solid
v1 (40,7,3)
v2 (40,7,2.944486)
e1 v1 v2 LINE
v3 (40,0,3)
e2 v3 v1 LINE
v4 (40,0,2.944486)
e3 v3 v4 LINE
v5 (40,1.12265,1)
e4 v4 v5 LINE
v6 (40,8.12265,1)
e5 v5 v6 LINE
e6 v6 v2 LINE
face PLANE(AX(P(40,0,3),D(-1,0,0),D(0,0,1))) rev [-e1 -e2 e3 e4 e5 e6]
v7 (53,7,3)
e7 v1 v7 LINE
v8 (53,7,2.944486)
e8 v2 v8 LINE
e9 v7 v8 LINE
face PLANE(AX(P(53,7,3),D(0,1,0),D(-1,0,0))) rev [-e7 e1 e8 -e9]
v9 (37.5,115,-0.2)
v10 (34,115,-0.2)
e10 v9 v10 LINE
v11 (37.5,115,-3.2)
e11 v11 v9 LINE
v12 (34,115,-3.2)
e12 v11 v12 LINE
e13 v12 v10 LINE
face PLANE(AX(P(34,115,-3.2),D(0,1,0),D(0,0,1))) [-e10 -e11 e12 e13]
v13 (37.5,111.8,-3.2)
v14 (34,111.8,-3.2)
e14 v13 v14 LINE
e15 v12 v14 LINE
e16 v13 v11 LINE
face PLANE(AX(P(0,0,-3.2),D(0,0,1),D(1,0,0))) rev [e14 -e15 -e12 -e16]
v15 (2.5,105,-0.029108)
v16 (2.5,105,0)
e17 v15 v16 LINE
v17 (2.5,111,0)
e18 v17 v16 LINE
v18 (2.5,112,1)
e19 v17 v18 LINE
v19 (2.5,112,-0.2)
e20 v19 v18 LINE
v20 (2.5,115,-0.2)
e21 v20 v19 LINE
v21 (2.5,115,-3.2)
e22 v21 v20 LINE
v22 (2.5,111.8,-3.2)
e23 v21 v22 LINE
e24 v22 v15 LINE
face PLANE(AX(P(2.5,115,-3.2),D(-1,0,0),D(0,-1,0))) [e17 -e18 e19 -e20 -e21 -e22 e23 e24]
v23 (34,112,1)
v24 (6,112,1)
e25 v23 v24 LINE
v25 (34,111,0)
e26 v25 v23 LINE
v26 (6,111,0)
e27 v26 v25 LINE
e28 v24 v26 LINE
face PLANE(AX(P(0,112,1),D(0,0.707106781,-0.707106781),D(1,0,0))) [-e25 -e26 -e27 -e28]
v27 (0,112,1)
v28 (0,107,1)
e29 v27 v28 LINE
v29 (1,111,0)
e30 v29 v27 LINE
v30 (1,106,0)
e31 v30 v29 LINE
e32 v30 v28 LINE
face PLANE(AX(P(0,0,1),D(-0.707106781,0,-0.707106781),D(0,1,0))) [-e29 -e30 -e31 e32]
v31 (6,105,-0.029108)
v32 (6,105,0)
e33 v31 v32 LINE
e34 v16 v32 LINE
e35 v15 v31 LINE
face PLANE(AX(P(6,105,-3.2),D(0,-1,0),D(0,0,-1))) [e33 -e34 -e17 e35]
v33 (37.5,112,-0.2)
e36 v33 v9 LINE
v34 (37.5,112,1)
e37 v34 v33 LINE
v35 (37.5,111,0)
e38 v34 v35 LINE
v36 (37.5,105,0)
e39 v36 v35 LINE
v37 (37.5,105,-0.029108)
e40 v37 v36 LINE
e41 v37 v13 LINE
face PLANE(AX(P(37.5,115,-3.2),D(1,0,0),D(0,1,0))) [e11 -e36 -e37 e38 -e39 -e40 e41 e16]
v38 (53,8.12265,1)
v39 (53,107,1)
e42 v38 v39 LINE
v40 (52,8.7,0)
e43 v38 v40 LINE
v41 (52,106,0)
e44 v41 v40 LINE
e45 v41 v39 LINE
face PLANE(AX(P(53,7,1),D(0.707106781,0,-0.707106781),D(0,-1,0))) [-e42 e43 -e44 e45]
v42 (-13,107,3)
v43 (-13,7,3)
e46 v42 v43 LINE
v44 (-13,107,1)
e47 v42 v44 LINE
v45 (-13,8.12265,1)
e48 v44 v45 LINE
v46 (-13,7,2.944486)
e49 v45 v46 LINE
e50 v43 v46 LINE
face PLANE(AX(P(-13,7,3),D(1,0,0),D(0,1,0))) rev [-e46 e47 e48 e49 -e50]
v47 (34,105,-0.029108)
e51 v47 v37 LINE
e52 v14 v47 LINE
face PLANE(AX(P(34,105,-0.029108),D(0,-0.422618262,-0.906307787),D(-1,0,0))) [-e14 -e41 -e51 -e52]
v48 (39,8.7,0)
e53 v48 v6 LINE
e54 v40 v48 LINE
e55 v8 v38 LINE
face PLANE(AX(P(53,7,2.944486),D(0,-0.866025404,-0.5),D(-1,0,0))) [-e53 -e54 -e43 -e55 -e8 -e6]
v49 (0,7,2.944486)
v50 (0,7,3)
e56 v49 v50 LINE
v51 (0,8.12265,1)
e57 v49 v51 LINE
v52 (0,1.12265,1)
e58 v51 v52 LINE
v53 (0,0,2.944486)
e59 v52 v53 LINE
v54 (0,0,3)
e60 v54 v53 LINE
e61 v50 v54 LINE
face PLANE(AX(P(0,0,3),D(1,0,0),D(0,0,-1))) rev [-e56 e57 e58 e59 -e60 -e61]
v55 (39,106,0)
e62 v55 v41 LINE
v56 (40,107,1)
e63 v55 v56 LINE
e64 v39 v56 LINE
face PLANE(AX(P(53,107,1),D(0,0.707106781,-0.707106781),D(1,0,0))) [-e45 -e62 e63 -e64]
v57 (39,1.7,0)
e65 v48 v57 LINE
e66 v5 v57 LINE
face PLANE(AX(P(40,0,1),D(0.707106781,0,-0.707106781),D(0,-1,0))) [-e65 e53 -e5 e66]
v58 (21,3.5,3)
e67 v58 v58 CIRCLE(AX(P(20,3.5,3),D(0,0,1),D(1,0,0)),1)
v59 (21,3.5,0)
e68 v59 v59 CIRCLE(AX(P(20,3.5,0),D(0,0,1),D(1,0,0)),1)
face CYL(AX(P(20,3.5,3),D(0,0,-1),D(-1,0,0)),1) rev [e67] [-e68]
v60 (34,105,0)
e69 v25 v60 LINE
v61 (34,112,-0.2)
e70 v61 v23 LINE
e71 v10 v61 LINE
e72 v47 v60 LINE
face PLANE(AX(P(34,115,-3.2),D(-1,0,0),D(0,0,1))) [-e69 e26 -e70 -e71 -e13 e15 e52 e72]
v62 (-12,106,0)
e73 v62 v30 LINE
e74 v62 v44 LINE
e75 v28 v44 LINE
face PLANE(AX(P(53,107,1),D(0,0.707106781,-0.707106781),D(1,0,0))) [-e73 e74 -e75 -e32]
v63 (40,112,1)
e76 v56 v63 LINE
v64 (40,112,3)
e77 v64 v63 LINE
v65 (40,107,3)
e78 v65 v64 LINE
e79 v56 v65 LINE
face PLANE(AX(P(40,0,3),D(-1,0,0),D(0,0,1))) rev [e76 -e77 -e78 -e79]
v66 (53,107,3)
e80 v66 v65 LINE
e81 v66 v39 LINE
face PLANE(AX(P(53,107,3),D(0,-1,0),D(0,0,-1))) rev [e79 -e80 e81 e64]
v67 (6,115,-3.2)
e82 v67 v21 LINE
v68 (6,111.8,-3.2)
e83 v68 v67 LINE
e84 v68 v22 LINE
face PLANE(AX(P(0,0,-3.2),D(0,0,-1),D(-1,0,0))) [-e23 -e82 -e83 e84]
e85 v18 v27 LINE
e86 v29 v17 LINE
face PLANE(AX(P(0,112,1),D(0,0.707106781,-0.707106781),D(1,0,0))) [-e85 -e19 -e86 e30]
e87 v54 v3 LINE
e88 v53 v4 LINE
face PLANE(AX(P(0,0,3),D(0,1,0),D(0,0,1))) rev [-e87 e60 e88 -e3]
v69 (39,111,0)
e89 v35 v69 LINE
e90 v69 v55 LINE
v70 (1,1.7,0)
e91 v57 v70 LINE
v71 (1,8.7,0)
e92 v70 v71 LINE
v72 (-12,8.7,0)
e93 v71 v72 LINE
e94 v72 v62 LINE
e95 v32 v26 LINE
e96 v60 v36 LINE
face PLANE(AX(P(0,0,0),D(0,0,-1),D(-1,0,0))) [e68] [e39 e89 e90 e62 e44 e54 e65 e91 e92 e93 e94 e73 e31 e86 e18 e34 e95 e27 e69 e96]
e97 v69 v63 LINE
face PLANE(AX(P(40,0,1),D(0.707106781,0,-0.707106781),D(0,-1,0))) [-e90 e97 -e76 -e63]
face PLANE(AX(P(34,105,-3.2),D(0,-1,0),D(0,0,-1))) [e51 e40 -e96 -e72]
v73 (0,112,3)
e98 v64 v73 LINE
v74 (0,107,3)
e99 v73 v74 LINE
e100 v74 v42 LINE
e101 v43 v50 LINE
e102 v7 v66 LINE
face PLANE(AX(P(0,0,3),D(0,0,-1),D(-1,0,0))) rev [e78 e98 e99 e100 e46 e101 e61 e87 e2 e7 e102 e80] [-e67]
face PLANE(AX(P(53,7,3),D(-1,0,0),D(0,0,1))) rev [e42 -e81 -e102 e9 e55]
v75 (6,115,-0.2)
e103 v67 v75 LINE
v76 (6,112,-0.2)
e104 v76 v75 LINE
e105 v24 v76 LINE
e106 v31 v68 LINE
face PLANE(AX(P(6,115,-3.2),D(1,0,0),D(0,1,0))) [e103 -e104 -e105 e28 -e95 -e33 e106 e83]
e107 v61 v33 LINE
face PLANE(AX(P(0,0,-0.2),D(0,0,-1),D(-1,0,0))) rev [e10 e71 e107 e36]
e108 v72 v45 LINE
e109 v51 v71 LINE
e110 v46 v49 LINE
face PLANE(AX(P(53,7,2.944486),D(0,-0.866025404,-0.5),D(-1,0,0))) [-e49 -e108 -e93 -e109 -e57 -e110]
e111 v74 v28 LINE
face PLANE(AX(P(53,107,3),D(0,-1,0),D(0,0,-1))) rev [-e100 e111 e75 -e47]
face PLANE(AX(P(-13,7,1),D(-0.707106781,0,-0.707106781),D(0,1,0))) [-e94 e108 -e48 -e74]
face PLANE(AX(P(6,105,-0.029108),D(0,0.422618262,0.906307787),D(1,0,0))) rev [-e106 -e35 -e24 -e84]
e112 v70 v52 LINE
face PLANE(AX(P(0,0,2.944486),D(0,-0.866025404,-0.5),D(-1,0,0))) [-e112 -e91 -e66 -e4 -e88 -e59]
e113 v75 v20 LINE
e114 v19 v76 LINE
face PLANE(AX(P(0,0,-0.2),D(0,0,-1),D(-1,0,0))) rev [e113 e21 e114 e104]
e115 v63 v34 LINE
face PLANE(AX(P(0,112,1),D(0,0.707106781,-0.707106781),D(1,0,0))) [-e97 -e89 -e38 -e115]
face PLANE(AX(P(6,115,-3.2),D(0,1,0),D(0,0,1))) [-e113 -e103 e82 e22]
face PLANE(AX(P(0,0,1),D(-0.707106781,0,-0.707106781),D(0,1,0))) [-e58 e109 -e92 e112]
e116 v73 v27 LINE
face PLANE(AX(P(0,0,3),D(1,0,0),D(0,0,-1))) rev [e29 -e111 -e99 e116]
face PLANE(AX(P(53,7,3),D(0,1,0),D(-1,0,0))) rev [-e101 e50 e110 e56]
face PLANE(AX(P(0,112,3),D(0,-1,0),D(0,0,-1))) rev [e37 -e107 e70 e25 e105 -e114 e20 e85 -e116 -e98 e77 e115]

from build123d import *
from OCP.BRepFilletAPI import BRepFilletAPI_MakeChamfer

# Parameters (mm, degrees)
SKETCH_1_W          = 40
SKETCH_1_H          = 112
EXTRUDE_1_DEPTH     = 3
SKETCH_2_R          = 1
CUT_EXTRUDE_1_DEPTH = 3
SKETCH_3_W          = 3.5
SKETCH_3_H          = 10
EXTRUDE_2_DEPTH     = 3.2
CHAMFER_1_SIZE      = 6.8
CHAMFER_1_SIZE2     = 3.170892075
SKETCH_4_W          = 66
SKETCH_4_H          = 100
EXTRUDE_3_DEPTH     = 3
SKETCH_5_W          = 42.259647881
SKETCH_5_H          = 3.16572893
CUT_EXTRUDE_2_DEPTH = 0.2
CHAMFER_3_SIZE      = 1
CHAMFER_4_SIZE      = 2.944486373
CHAMFER_4_SIZE_2    = 1.7


with BuildPart() as part:
    # 草圖1 → 填料-伸長1 (new body)
    with BuildSketch(Plane.XY):
        with Locations((20, 56)):
            Rectangle(SKETCH_1_W, SKETCH_1_H)
    extrude(amount=EXTRUDE_1_DEPTH)

    # 草圖2 → 除料-伸長1 (cut)
    with BuildSketch(Plane.XY):
        with Locations((20, 3.5)):
            Circle(SKETCH_2_R)
    extrude(amount=CUT_EXTRUDE_1_DEPTH, mode=Mode.SUBTRACT)

    # 草圖3 → 填料-伸長2 (add)
    with BuildSketch(Plane.XY):
        with Locations((35.75, 110)):
            Rectangle(SKETCH_3_W, SKETCH_3_H)
        with Locations((4.25, 110)):
            Rectangle(SKETCH_3_W, SKETCH_3_H)
    extrude(amount=-EXTRUDE_2_DEPTH)

    # 導角1: one chamfer whose edges measure the first distance from different faces: ONE call of the kernel's chamfer builder (chamfer() names one face for all edges)
    chamfer_1_edges_1 = [part.edges().sort_by_distance(p)[0] for p in [
        (35.75, 105, -3.2),
    ]]
    chamfer_1_side_1 = [part.faces().sort_by_distance(p)[0] for p in [
        (35.75, 110, -3.2),
    ]]
    chamfer_1_edges_2 = [part.edges().sort_by_distance(p)[0] for p in [
        (4.25, 105, -3.2),
    ]]
    chamfer_1_side_2 = [part.faces().sort_by_distance(p)[0] for p in [
        (4.25, 110, -3.2),
    ]]
    chamfer_1 = BRepFilletAPI_MakeChamfer(part.part.solid().wrapped)
    for e in chamfer_1_edges_1:
        chamfer_1.Add(CHAMFER_1_SIZE, CHAMFER_1_SIZE2, e.wrapped, chamfer_1_side_1[0].wrapped)  # the first distance lies on this face
    for e in chamfer_1_edges_2:
        chamfer_1.Add(CHAMFER_1_SIZE, CHAMFER_1_SIZE2, e.wrapped, chamfer_1_side_2[0].wrapped)  # the first distance lies on this face
    add(Compound.cast(chamfer_1.Shape()), mode=Mode.REPLACE)

    # 草圖4 → 填料-伸長3 (add)
    with BuildSketch(Plane.XY):
        with Locations((20, 57)):
            Rectangle(SKETCH_4_W, SKETCH_4_H)
    extrude(amount=EXTRUDE_3_DEPTH)

    # 草圖5 → 除料-伸長2 (cut)
    with BuildSketch(Plane.XY):
        with Locations((18.12982394, 113.582864465)):
            Rectangle(SKETCH_5_W, SKETCH_5_H)
    extrude(amount=-CUT_EXTRUDE_2_DEPTH, mode=Mode.SUBTRACT)

    # 導角3
    chamfer_3_edges = [part.edges().sort_by_distance(p)[0] for p in [
        (20, 112, 0),
        (1.25, 112, 0),
        (38.75, 112, 0),
        (40, 3.5, 0),
        (0, 109.5, 0),
        (40, 109.5, 0),
        (0, 3.5, 0),
        (-6.5, 107, 0),
        (46.5, 107, 0),
        (53, 57, 0),
        (-13, 57, 0),
    ]]
    chamfer(chamfer_3_edges, length=CHAMFER_3_SIZE)

    # 導角4
    # the kernel refuses this chamfer: 2.944486373, 1.7 mm, written as the material it takes off along each edge
    with BuildSketch(Plane(origin=(8.61763875, 7, 0), x_dir=(0, -0.01932676561270069, 0.9998132206222079), z_dir=(-1, 0, 0))) as chamfer_4_piece_1_section:
        Polygon((CHAMFER_4_SIZE * 0.999813220577, CHAMFER_4_SIZE * 0.0193267656118), (-CHAMFER_4_SIZE_2 * 0.0193267656127, CHAMFER_4_SIZE_2 * 0.999813220622), (0, 0), align=None)
    chamfer_4_piece_1 = extrude(amount=28.2352775, mode=Mode.PRIVATE)
    chamfer_4_piece_1 = split(chamfer_4_piece_1, bisect_by=Plane(origin=(0.556062959, 7.780962214, 0.443937041), z_dir=(-0.7071067811865476, 0, -0.7071067811865476)), keep=Keep.TOP, mode=Mode.PRIVATE)
    chamfer_4_piece_1 = split(chamfer_4_piece_1, bisect_by=Plane(origin=(0, 7.780962214, 0.258582722), z_dir=(1, 0, 0)), keep=Keep.TOP, mode=Mode.PRIVATE)
    add(chamfer_4_piece_1, mode=Mode.SUBTRACT)
    with BuildSketch(Plane(origin=(8.61763875, 7, 0), x_dir=(0, -0.01932676561270069, 0.9998132206222079), z_dir=(-1, 0, 0))) as chamfer_4_piece_2_section:
        Polygon((CHAMFER_4_SIZE * 0.999813220577, CHAMFER_4_SIZE * 0.0193267656118), (-CHAMFER_4_SIZE_2 * 0.0193267656127, CHAMFER_4_SIZE_2 * 0.999813220622), (0, 0), align=None)
    chamfer_4_piece_2 = extrude(amount=28.2352775, mode=Mode.PRIVATE)
    chamfer_4_piece_2 = split(chamfer_4_piece_2, bisect_by=Plane(origin=(-0.79990122, 7.215436489, 1.79990122), z_dir=(0.7071067811865476, 0, 0.7071067811865476)), keep=Keep.TOP, mode=Mode.PRIVATE)
    chamfer_4_piece_2 = split(chamfer_4_piece_2, bisect_by=Plane(origin=(0, 7.215436489, 2.06653496), z_dir=(-1, 0, 0)), keep=Keep.TOP, mode=Mode.PRIVATE)
    add(chamfer_4_piece_2, mode=Mode.SUBTRACT)
    with BuildSketch(Plane(origin=(8.61763875, 7, 0), x_dir=(0, -0.01932676561270069, 0.9998132206222079), z_dir=(-1, 0, 0))) as chamfer_4_piece_3_section:
        Polygon((CHAMFER_4_SIZE * 0.999813220577, CHAMFER_4_SIZE * 0.0193267656118), (-CHAMFER_4_SIZE_2 * 0.0193267656127, CHAMFER_4_SIZE_2 * 0.999813220622), (0, 0), align=None)
    chamfer_4_piece_3 = extrude(amount=28.2352775, mode=Mode.PRIVATE)
    chamfer_4_piece_3 = split(chamfer_4_piece_3, bisect_by=Plane(origin=(-4.964199095, 7.550450485, 5.964199095), z_dir=(-0.7071067811865476, 0, -0.7071067811865476)), keep=Keep.TOP, mode=Mode.PRIVATE)
    chamfer_4_piece_3 = split(chamfer_4_piece_3, bisect_by=Plane(origin=(0, 7.550450485, 0.970145216), z_dir=(-1, 0, 0)), keep=Keep.TOP, mode=Mode.PRIVATE)
    add(chamfer_4_piece_3, mode=Mode.SUBTRACT)
    with BuildSketch(Plane(origin=(59.61763875, 7, 0), x_dir=(0, -0.01932676561270069, 0.9998132206222079), z_dir=(-1, 0, 0))) as chamfer_4_piece_4_section:
        Polygon((CHAMFER_4_SIZE * 0.999813220577, CHAMFER_4_SIZE * 0.0193267656118), (-CHAMFER_4_SIZE_2 * 0.0193267656127, CHAMFER_4_SIZE_2 * 0.999813220622), (0, 0), align=None)
    chamfer_4_piece_4 = extrude(amount=28.2352775, mode=Mode.PRIVATE)
    chamfer_4_piece_4 = split(chamfer_4_piece_4, bisect_by=Plane(origin=(40, 7.550450485, 0.970145216), z_dir=(1, 0, 0)), keep=Keep.TOP, mode=Mode.PRIVATE)
    chamfer_4_piece_4 = split(chamfer_4_piece_4, bisect_by=Plane(origin=(44.964199095, 7.550450485, 5.964199095), z_dir=(0.7071067811865476, 0, -0.7071067811865476)), keep=Keep.TOP, mode=Mode.PRIVATE)
    add(chamfer_4_piece_4, mode=Mode.SUBTRACT)
    with BuildSketch(Plane(origin=(59.61763875, 7, 0), x_dir=(0, -0.01932676561270069, 0.9998132206222079), z_dir=(-1, 0, 0))) as chamfer_4_piece_5_section:
        Polygon((CHAMFER_4_SIZE * 0.999813220577, CHAMFER_4_SIZE * 0.0193267656118), (-CHAMFER_4_SIZE_2 * 0.0193267656127, CHAMFER_4_SIZE_2 * 0.999813220622), (0, 0), align=None)
    chamfer_4_piece_5 = extrude(amount=28.2352775, mode=Mode.PRIVATE)
    chamfer_4_piece_5 = split(chamfer_4_piece_5, bisect_by=Plane(origin=(40, 7.780962214, 0.258582722), z_dir=(-1, 0, 0)), keep=Keep.TOP, mode=Mode.PRIVATE)
    chamfer_4_piece_5 = split(chamfer_4_piece_5, bisect_by=Plane(origin=(39.443937041, 7.780962214, 0.443937041), z_dir=(0.7071067811865476, 0, -0.7071067811865476)), keep=Keep.TOP, mode=Mode.PRIVATE)
    add(chamfer_4_piece_5, mode=Mode.SUBTRACT)
    with BuildSketch(Plane(origin=(59.61763875, 7, 0), x_dir=(0, -0.01932676561270069, 0.9998132206222079), z_dir=(-1, 0, 0))) as chamfer_4_piece_6_section:
        Polygon((CHAMFER_4_SIZE * 0.999813220577, CHAMFER_4_SIZE * 0.0193267656118), (-CHAMFER_4_SIZE_2 * 0.0193267656127, CHAMFER_4_SIZE_2 * 0.999813220622), (0, 0), align=None)
    chamfer_4_piece_6 = extrude(amount=28.2352775, mode=Mode.PRIVATE)
    chamfer_4_piece_6 = split(chamfer_4_piece_6, bisect_by=Plane(origin=(40, 7.215436489, 2.06653496), z_dir=(1, 0, 0)), keep=Keep.TOP, mode=Mode.PRIVATE)
    chamfer_4_piece_6 = split(chamfer_4_piece_6, bisect_by=Plane(origin=(40.79990122, 7.215436489, 1.79990122), z_dir=(-0.7071067811865476, 0, 0.7071067811865476)), keep=Keep.TOP, mode=Mode.PRIVATE)
    add(chamfer_4_piece_6, mode=Mode.SUBTRACT)
    with BuildSketch(Plane(origin=(-6.61763875, 0, 0), x_dir=(0, -0.019326765612700646, 0.9998132206222079), z_dir=(1, 0, 0))) as chamfer_4_piece_7:
        Polygon((CHAMFER_4_SIZE * 0.999813220577, -CHAMFER_4_SIZE * 0.0193267656118), (-CHAMFER_4_SIZE_2 * 0.0193267656127, -CHAMFER_4_SIZE_2 * 0.999813220622), (0, 0), align=None)
    extrude(amount=53.2352775, mode=Mode.SUBTRACT)


solid = part.part
